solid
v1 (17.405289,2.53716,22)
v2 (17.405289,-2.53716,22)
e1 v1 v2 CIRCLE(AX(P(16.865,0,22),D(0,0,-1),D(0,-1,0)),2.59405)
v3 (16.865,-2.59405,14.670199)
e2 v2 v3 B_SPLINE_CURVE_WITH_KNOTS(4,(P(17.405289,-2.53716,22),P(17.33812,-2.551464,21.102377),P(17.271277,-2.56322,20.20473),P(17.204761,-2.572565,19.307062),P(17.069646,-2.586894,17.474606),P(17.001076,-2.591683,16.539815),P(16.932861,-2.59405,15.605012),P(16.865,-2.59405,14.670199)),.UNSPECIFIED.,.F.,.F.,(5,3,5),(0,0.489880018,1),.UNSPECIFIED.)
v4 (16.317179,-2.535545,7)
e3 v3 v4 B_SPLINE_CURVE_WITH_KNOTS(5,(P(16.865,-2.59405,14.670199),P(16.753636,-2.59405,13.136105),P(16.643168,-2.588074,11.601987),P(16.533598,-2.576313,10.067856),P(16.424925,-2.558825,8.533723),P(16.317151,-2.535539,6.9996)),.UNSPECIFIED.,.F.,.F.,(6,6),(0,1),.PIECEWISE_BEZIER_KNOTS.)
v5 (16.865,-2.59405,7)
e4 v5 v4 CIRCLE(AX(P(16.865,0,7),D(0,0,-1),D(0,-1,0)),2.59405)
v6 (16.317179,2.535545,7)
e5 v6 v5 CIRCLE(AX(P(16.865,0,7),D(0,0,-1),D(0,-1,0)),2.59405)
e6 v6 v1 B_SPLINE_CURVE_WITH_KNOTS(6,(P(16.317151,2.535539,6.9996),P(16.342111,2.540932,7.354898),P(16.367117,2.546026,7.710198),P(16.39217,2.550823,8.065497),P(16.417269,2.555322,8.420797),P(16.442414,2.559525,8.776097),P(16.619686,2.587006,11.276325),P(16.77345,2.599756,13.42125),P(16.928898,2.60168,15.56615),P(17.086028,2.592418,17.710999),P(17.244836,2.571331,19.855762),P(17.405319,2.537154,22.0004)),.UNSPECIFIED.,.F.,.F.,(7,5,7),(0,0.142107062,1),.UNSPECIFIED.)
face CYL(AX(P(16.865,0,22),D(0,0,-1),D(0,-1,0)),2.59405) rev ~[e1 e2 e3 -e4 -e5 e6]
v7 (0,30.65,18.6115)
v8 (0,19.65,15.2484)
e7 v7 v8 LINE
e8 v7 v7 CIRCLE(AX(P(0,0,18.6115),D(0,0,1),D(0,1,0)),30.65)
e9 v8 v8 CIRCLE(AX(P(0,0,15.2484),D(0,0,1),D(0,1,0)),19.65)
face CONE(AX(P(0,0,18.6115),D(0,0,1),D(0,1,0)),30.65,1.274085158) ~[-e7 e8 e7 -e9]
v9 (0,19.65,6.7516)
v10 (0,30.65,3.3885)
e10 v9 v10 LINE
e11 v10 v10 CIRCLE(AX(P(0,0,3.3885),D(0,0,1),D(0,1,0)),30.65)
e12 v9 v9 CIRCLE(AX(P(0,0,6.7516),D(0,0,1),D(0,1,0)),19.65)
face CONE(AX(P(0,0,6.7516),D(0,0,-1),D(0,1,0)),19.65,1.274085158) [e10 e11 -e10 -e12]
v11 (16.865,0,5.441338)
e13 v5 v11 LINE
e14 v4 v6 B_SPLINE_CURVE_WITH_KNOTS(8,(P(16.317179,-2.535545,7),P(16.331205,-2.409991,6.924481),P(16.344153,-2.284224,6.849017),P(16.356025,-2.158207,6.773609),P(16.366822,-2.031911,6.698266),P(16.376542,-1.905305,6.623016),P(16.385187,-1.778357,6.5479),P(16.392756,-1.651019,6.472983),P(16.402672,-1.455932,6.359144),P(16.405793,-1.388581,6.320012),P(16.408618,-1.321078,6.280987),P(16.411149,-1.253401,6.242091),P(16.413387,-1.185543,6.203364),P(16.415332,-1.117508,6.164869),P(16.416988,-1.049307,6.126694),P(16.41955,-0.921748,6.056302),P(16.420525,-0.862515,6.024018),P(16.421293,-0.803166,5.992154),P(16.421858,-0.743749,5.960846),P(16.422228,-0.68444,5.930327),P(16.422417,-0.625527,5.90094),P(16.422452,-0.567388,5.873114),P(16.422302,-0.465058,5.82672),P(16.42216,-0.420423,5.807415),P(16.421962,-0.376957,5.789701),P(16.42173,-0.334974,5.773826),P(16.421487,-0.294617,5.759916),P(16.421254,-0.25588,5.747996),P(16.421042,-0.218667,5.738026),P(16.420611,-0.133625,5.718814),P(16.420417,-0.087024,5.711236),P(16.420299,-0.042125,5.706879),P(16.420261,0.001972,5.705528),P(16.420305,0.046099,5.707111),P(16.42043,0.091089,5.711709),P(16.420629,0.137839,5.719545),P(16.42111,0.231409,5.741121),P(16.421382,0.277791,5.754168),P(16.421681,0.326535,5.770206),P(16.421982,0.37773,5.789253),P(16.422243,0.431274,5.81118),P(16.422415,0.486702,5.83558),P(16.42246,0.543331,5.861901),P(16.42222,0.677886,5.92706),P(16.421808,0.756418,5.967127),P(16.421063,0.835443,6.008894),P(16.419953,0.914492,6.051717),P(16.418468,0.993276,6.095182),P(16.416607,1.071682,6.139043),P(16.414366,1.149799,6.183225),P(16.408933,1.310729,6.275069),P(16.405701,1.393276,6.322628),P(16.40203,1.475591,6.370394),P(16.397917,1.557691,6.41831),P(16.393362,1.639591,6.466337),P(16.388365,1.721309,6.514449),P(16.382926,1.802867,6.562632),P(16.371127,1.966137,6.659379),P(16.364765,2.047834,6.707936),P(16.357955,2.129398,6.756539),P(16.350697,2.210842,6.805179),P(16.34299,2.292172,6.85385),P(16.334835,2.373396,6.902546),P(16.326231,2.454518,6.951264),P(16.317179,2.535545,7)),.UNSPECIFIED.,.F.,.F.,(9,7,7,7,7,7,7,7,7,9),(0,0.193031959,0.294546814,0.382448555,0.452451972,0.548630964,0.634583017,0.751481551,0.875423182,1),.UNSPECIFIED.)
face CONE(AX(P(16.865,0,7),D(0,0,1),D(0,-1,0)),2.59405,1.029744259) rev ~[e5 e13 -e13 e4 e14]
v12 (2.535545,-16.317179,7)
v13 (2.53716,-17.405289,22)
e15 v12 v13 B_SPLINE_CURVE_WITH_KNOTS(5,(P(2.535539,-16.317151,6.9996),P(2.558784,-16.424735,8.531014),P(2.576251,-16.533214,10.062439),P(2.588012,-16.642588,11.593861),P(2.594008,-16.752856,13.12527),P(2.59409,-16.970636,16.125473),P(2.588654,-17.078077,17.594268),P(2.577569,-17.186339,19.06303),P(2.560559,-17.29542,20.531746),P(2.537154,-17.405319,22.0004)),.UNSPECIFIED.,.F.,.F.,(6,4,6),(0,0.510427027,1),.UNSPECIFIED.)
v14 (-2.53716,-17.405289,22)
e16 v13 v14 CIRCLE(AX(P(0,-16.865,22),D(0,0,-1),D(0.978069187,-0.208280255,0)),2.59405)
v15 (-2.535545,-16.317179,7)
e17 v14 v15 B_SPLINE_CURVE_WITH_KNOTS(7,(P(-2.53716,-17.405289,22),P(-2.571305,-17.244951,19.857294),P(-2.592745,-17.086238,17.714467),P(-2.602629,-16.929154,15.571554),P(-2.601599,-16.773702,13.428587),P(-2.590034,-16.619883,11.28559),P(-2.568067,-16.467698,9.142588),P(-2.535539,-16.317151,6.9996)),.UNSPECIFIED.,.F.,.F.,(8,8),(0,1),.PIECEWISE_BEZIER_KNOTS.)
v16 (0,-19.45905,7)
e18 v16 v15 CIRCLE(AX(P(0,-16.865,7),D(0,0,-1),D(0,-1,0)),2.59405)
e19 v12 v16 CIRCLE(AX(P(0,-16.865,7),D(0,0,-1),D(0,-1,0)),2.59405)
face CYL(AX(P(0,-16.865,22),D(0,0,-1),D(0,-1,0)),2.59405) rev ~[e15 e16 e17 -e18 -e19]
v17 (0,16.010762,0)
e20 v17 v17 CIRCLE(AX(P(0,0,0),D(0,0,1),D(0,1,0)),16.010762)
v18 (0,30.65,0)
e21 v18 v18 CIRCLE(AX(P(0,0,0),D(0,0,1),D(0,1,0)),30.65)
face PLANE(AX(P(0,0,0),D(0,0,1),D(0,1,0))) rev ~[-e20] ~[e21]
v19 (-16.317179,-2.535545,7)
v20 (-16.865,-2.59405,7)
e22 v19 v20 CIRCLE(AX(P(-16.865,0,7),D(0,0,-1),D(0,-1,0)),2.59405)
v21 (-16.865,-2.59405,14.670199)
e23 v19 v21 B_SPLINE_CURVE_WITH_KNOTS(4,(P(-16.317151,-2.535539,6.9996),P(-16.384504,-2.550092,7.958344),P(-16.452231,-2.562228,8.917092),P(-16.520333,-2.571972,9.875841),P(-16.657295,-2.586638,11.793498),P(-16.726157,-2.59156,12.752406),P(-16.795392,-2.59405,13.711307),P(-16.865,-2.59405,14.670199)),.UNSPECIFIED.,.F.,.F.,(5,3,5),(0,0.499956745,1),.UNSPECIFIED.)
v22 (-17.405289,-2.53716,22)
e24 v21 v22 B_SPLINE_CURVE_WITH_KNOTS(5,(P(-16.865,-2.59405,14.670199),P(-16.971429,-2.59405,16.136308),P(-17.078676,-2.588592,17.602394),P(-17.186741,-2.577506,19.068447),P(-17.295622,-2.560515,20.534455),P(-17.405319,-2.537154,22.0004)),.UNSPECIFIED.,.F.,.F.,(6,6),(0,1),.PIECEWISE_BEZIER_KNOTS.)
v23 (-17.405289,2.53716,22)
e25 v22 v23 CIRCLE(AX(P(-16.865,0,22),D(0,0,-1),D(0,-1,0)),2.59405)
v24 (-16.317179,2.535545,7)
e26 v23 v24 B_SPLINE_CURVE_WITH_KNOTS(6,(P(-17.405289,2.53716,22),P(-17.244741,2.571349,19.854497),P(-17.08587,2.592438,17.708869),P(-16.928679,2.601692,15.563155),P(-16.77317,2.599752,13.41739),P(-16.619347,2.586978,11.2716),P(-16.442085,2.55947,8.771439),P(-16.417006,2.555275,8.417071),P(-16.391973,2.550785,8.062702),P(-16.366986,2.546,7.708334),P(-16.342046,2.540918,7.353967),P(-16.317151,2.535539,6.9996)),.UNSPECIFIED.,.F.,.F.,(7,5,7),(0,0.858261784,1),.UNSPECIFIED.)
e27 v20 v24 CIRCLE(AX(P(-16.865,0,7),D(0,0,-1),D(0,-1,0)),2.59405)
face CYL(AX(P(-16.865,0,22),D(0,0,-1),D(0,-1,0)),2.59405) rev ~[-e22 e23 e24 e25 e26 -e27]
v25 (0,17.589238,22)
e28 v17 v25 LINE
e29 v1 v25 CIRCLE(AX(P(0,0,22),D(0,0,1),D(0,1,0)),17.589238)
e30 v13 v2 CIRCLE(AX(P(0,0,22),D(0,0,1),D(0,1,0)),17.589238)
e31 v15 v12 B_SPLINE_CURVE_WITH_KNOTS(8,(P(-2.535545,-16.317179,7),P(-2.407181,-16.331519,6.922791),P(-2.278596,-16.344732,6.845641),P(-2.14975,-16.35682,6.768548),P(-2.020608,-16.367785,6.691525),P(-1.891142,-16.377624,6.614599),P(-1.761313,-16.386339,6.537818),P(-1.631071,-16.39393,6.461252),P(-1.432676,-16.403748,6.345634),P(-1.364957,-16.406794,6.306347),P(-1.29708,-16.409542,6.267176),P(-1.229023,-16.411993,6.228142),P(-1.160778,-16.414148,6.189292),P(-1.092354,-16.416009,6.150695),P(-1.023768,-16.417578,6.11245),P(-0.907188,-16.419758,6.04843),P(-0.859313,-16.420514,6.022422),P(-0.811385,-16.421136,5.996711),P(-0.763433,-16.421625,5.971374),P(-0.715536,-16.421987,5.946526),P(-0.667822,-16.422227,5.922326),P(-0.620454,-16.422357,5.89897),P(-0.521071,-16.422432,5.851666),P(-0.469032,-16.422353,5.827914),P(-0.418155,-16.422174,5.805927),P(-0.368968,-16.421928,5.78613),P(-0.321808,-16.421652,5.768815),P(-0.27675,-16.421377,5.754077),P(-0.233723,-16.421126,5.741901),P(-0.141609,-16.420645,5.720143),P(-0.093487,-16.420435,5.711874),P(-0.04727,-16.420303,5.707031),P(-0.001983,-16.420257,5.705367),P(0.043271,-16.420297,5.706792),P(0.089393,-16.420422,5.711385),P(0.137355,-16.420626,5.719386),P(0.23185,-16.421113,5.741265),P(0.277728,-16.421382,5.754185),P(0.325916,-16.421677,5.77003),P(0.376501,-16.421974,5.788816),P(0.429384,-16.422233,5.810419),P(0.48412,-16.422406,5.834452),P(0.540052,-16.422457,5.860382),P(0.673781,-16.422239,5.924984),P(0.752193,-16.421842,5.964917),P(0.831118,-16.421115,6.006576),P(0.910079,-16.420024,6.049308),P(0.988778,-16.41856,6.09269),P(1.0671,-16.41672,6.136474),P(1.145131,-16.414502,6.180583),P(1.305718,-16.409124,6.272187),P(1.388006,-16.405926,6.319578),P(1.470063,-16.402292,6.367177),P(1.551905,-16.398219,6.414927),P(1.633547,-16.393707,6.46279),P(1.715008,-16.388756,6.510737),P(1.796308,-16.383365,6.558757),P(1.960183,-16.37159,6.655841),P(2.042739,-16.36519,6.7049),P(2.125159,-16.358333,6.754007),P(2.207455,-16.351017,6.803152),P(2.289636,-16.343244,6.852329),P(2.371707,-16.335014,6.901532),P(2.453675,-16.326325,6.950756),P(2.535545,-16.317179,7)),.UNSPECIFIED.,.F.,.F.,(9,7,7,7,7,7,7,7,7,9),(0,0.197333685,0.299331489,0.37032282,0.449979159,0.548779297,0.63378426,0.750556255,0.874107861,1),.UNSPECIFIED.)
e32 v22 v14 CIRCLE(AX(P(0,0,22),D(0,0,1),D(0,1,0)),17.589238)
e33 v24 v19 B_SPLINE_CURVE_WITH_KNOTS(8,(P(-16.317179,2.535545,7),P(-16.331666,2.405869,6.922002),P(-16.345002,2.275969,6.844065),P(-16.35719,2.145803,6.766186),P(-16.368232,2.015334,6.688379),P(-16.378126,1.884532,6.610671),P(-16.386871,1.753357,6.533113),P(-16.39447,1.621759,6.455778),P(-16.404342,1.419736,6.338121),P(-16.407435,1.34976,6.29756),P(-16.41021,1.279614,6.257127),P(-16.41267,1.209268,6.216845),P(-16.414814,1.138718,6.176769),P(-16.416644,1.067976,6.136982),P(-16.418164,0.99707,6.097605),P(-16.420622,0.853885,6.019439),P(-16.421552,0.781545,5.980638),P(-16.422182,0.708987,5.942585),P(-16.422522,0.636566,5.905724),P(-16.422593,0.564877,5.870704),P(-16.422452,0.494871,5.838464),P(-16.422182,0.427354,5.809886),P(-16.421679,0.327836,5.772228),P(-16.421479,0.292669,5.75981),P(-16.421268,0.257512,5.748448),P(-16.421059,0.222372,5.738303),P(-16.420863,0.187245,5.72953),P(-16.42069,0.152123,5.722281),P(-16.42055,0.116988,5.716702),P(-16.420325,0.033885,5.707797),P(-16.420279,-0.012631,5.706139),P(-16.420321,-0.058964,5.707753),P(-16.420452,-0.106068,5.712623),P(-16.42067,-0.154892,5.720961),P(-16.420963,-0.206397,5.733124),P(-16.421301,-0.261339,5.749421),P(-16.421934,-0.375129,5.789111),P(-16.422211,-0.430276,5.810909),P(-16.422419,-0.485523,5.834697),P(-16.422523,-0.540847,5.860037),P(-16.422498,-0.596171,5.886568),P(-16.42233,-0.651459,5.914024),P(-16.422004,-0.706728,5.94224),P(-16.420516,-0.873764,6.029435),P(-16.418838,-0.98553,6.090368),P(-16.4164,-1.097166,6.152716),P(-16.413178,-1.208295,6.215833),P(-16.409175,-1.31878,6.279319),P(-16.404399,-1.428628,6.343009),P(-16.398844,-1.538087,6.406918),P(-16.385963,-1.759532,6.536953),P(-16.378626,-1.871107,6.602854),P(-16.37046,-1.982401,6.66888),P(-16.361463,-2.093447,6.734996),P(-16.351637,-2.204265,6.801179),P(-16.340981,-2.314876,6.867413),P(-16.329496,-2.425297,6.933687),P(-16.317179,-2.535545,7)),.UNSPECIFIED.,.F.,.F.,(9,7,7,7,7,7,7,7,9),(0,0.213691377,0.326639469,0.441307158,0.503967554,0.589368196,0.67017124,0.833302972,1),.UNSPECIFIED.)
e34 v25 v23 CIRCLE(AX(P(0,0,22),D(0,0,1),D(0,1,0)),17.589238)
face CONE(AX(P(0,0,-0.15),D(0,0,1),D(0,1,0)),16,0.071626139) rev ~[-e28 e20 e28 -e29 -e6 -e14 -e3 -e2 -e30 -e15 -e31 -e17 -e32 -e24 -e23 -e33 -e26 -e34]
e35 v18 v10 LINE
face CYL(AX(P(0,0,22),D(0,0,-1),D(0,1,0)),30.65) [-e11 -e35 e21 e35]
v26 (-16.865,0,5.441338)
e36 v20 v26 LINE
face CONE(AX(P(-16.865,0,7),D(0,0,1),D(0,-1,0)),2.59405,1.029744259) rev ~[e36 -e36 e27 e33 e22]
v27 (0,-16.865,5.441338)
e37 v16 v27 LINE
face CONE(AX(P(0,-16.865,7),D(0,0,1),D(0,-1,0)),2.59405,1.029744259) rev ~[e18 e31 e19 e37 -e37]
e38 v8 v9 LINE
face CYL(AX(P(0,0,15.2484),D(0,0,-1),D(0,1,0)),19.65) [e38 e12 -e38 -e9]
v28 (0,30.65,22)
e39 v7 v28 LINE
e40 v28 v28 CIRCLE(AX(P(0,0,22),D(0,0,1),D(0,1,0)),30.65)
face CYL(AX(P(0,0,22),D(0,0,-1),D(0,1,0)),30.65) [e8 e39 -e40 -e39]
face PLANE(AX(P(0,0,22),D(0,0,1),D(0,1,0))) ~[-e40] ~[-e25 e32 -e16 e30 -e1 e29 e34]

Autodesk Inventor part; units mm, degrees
ref_plane "YZ Plane" through (0, 0, 0) normal (1, 0, 0) x (0, 1, 0)
ref_plane "XZ Plane" through (0, 0, 0) normal (0, 1, 0) x (-1, 0, 0)
sketch "Esquisse principale" plane through (0, 0, 0) normal (1, 0, 0) x (0, 1, 0)
  line L0 (0, 22) -> (30.65, 22)
  line L1 (30.65, 22) -> (30.65, 18.6115)
  line L2 (30.65, 18.6115) -> (19.65, 15.2484)
  line L3 (19.65, 15.2484) -> (19.65, 6.7516)
  line L4 (19.65, 6.7516) -> (30.65, 3.3885)
  line L5 (30.65, 3.3885) -> (30.65, 0)
  line L6 (30.65, 0) -> (0, 0)
  line L7 (28.65, 18) -> (28.65, 4) construction
  line L8 (19.65, 11) -> (28.65, 11) construction
  line L9 (30.65, 18.6115) -> (30.65, 3.3885)
  line L10 (0, -4.4) -> (0, 26.4) projected
  line L11 (0, 0) -> (0, 22)
  dimension "d0" = 14
  dimension "d1" = 34
  dimension "d2" = 2
  dimension "d6" = 22
  dimension "d21" = 57.3
  dimension "d25" = 11
  dimension "d27" = 11
ref_plane "Plan de courroie" through (0, 19.65, 11) normal (0, 0, 1) x (1, 0, 0)
revolve "Corps" add sketch "Esquisse principale" angle 360 about axis through (0, 0, -10) along (0, 0, 1)
revolve "Bord" cut sketch "Esquisse principale" angle 360 about axis through (0, 0, -10) along (0, 0, 1) contours L9 L4 L3 L2
fillet "Congé externe" [suppressed]
fillet "Congé interne" [suppressed]
pattern_of_one "Réseau de bords"
sketch "Esquisse5" plane through (0, 0, 0) normal (1, 0, 0) x (0, 1, 0)
  line L0 (0, -3.4128) -> (0, 36.612)
  line L1 (-30.65, 22) -> (30.65, 22) projected
  line L2 (0, 22.15) -> (17.6, 22.15)
  line L3 (0, -0.15) -> (16, -0.15)
  line L4 (16, -0.15) -> (17.6, 22.15)
  line L5 (-30.65, 0) -> (30.65, 0) projected
  point P0 (0, 0)
  point P1 (0, 0)
  point P2 (16.0108, 0)
  point P3 (17.5892, 22)
  point P4 (0, 22)
  dimension "d42" = 17.6
  dimension "d43" = 16
  dimension "d44" = 22.3
  dimension "d45" = 0.15
revolve "Révolution4" cut sketch "Esquisse5" angle 360 about axis through (0, 0, -3.4128) along (0, 0, 1) contours L0 L1 L4 L5
sketch "Esquisse6" plane through (0, 0, 22) normal (0, 0, 1) x (1, 0, 0)
  circle A0 centre (0, 0) radius 16.865
  line L0 (0, 0) -> (0, -20.3101)
  line L1 (0, 0) -> (20.7504, 0)
  line L2 (0, 0) -> (-20.5452, 0)
  point P0 (0, -16.865)
  point P1 (-16.865, 0)
  point P2 (16.865, 0)
  dimension "d54" = 33.73
hole "Perçage2" at (0, -16.865, 22) at (-16.865, 0, 22) at (16.865, 0, 22) direction (0, 0, -1) diameter 5.1881 depth 15 tip angle 118 thread size "M6x0.75" class "6H" standard "ANSI Metric M Profile"
equation "\"d0\" = da_Bw"
equation "\"d1\" = da_Alfa"
equation "\"d2\" = da_c"
equation "\"d21\" = da_Dw"
equation "\"d25\" = da_Hd"
equation "\"d27\" = da_Se"
equation "\"da_r1\" = 0"
equation "\"da_r2\" = 0"
equation "\"d18\" = da_Sg"
equation "\"d5\" = da_Se"
equation "\"da_Bw\" = 14"
equation "\"da_Alfa\" = 34deg"
equation "\"da_c\" = 2"
equation "\"da_Dw\" = 57.3"
equation "\"da_Hd\" = 11"
equation "\"da_Se\" = 11"
equation "\"da_Sg\" = 12"
properties part number "Poulie à gorge2" material "Steel"
